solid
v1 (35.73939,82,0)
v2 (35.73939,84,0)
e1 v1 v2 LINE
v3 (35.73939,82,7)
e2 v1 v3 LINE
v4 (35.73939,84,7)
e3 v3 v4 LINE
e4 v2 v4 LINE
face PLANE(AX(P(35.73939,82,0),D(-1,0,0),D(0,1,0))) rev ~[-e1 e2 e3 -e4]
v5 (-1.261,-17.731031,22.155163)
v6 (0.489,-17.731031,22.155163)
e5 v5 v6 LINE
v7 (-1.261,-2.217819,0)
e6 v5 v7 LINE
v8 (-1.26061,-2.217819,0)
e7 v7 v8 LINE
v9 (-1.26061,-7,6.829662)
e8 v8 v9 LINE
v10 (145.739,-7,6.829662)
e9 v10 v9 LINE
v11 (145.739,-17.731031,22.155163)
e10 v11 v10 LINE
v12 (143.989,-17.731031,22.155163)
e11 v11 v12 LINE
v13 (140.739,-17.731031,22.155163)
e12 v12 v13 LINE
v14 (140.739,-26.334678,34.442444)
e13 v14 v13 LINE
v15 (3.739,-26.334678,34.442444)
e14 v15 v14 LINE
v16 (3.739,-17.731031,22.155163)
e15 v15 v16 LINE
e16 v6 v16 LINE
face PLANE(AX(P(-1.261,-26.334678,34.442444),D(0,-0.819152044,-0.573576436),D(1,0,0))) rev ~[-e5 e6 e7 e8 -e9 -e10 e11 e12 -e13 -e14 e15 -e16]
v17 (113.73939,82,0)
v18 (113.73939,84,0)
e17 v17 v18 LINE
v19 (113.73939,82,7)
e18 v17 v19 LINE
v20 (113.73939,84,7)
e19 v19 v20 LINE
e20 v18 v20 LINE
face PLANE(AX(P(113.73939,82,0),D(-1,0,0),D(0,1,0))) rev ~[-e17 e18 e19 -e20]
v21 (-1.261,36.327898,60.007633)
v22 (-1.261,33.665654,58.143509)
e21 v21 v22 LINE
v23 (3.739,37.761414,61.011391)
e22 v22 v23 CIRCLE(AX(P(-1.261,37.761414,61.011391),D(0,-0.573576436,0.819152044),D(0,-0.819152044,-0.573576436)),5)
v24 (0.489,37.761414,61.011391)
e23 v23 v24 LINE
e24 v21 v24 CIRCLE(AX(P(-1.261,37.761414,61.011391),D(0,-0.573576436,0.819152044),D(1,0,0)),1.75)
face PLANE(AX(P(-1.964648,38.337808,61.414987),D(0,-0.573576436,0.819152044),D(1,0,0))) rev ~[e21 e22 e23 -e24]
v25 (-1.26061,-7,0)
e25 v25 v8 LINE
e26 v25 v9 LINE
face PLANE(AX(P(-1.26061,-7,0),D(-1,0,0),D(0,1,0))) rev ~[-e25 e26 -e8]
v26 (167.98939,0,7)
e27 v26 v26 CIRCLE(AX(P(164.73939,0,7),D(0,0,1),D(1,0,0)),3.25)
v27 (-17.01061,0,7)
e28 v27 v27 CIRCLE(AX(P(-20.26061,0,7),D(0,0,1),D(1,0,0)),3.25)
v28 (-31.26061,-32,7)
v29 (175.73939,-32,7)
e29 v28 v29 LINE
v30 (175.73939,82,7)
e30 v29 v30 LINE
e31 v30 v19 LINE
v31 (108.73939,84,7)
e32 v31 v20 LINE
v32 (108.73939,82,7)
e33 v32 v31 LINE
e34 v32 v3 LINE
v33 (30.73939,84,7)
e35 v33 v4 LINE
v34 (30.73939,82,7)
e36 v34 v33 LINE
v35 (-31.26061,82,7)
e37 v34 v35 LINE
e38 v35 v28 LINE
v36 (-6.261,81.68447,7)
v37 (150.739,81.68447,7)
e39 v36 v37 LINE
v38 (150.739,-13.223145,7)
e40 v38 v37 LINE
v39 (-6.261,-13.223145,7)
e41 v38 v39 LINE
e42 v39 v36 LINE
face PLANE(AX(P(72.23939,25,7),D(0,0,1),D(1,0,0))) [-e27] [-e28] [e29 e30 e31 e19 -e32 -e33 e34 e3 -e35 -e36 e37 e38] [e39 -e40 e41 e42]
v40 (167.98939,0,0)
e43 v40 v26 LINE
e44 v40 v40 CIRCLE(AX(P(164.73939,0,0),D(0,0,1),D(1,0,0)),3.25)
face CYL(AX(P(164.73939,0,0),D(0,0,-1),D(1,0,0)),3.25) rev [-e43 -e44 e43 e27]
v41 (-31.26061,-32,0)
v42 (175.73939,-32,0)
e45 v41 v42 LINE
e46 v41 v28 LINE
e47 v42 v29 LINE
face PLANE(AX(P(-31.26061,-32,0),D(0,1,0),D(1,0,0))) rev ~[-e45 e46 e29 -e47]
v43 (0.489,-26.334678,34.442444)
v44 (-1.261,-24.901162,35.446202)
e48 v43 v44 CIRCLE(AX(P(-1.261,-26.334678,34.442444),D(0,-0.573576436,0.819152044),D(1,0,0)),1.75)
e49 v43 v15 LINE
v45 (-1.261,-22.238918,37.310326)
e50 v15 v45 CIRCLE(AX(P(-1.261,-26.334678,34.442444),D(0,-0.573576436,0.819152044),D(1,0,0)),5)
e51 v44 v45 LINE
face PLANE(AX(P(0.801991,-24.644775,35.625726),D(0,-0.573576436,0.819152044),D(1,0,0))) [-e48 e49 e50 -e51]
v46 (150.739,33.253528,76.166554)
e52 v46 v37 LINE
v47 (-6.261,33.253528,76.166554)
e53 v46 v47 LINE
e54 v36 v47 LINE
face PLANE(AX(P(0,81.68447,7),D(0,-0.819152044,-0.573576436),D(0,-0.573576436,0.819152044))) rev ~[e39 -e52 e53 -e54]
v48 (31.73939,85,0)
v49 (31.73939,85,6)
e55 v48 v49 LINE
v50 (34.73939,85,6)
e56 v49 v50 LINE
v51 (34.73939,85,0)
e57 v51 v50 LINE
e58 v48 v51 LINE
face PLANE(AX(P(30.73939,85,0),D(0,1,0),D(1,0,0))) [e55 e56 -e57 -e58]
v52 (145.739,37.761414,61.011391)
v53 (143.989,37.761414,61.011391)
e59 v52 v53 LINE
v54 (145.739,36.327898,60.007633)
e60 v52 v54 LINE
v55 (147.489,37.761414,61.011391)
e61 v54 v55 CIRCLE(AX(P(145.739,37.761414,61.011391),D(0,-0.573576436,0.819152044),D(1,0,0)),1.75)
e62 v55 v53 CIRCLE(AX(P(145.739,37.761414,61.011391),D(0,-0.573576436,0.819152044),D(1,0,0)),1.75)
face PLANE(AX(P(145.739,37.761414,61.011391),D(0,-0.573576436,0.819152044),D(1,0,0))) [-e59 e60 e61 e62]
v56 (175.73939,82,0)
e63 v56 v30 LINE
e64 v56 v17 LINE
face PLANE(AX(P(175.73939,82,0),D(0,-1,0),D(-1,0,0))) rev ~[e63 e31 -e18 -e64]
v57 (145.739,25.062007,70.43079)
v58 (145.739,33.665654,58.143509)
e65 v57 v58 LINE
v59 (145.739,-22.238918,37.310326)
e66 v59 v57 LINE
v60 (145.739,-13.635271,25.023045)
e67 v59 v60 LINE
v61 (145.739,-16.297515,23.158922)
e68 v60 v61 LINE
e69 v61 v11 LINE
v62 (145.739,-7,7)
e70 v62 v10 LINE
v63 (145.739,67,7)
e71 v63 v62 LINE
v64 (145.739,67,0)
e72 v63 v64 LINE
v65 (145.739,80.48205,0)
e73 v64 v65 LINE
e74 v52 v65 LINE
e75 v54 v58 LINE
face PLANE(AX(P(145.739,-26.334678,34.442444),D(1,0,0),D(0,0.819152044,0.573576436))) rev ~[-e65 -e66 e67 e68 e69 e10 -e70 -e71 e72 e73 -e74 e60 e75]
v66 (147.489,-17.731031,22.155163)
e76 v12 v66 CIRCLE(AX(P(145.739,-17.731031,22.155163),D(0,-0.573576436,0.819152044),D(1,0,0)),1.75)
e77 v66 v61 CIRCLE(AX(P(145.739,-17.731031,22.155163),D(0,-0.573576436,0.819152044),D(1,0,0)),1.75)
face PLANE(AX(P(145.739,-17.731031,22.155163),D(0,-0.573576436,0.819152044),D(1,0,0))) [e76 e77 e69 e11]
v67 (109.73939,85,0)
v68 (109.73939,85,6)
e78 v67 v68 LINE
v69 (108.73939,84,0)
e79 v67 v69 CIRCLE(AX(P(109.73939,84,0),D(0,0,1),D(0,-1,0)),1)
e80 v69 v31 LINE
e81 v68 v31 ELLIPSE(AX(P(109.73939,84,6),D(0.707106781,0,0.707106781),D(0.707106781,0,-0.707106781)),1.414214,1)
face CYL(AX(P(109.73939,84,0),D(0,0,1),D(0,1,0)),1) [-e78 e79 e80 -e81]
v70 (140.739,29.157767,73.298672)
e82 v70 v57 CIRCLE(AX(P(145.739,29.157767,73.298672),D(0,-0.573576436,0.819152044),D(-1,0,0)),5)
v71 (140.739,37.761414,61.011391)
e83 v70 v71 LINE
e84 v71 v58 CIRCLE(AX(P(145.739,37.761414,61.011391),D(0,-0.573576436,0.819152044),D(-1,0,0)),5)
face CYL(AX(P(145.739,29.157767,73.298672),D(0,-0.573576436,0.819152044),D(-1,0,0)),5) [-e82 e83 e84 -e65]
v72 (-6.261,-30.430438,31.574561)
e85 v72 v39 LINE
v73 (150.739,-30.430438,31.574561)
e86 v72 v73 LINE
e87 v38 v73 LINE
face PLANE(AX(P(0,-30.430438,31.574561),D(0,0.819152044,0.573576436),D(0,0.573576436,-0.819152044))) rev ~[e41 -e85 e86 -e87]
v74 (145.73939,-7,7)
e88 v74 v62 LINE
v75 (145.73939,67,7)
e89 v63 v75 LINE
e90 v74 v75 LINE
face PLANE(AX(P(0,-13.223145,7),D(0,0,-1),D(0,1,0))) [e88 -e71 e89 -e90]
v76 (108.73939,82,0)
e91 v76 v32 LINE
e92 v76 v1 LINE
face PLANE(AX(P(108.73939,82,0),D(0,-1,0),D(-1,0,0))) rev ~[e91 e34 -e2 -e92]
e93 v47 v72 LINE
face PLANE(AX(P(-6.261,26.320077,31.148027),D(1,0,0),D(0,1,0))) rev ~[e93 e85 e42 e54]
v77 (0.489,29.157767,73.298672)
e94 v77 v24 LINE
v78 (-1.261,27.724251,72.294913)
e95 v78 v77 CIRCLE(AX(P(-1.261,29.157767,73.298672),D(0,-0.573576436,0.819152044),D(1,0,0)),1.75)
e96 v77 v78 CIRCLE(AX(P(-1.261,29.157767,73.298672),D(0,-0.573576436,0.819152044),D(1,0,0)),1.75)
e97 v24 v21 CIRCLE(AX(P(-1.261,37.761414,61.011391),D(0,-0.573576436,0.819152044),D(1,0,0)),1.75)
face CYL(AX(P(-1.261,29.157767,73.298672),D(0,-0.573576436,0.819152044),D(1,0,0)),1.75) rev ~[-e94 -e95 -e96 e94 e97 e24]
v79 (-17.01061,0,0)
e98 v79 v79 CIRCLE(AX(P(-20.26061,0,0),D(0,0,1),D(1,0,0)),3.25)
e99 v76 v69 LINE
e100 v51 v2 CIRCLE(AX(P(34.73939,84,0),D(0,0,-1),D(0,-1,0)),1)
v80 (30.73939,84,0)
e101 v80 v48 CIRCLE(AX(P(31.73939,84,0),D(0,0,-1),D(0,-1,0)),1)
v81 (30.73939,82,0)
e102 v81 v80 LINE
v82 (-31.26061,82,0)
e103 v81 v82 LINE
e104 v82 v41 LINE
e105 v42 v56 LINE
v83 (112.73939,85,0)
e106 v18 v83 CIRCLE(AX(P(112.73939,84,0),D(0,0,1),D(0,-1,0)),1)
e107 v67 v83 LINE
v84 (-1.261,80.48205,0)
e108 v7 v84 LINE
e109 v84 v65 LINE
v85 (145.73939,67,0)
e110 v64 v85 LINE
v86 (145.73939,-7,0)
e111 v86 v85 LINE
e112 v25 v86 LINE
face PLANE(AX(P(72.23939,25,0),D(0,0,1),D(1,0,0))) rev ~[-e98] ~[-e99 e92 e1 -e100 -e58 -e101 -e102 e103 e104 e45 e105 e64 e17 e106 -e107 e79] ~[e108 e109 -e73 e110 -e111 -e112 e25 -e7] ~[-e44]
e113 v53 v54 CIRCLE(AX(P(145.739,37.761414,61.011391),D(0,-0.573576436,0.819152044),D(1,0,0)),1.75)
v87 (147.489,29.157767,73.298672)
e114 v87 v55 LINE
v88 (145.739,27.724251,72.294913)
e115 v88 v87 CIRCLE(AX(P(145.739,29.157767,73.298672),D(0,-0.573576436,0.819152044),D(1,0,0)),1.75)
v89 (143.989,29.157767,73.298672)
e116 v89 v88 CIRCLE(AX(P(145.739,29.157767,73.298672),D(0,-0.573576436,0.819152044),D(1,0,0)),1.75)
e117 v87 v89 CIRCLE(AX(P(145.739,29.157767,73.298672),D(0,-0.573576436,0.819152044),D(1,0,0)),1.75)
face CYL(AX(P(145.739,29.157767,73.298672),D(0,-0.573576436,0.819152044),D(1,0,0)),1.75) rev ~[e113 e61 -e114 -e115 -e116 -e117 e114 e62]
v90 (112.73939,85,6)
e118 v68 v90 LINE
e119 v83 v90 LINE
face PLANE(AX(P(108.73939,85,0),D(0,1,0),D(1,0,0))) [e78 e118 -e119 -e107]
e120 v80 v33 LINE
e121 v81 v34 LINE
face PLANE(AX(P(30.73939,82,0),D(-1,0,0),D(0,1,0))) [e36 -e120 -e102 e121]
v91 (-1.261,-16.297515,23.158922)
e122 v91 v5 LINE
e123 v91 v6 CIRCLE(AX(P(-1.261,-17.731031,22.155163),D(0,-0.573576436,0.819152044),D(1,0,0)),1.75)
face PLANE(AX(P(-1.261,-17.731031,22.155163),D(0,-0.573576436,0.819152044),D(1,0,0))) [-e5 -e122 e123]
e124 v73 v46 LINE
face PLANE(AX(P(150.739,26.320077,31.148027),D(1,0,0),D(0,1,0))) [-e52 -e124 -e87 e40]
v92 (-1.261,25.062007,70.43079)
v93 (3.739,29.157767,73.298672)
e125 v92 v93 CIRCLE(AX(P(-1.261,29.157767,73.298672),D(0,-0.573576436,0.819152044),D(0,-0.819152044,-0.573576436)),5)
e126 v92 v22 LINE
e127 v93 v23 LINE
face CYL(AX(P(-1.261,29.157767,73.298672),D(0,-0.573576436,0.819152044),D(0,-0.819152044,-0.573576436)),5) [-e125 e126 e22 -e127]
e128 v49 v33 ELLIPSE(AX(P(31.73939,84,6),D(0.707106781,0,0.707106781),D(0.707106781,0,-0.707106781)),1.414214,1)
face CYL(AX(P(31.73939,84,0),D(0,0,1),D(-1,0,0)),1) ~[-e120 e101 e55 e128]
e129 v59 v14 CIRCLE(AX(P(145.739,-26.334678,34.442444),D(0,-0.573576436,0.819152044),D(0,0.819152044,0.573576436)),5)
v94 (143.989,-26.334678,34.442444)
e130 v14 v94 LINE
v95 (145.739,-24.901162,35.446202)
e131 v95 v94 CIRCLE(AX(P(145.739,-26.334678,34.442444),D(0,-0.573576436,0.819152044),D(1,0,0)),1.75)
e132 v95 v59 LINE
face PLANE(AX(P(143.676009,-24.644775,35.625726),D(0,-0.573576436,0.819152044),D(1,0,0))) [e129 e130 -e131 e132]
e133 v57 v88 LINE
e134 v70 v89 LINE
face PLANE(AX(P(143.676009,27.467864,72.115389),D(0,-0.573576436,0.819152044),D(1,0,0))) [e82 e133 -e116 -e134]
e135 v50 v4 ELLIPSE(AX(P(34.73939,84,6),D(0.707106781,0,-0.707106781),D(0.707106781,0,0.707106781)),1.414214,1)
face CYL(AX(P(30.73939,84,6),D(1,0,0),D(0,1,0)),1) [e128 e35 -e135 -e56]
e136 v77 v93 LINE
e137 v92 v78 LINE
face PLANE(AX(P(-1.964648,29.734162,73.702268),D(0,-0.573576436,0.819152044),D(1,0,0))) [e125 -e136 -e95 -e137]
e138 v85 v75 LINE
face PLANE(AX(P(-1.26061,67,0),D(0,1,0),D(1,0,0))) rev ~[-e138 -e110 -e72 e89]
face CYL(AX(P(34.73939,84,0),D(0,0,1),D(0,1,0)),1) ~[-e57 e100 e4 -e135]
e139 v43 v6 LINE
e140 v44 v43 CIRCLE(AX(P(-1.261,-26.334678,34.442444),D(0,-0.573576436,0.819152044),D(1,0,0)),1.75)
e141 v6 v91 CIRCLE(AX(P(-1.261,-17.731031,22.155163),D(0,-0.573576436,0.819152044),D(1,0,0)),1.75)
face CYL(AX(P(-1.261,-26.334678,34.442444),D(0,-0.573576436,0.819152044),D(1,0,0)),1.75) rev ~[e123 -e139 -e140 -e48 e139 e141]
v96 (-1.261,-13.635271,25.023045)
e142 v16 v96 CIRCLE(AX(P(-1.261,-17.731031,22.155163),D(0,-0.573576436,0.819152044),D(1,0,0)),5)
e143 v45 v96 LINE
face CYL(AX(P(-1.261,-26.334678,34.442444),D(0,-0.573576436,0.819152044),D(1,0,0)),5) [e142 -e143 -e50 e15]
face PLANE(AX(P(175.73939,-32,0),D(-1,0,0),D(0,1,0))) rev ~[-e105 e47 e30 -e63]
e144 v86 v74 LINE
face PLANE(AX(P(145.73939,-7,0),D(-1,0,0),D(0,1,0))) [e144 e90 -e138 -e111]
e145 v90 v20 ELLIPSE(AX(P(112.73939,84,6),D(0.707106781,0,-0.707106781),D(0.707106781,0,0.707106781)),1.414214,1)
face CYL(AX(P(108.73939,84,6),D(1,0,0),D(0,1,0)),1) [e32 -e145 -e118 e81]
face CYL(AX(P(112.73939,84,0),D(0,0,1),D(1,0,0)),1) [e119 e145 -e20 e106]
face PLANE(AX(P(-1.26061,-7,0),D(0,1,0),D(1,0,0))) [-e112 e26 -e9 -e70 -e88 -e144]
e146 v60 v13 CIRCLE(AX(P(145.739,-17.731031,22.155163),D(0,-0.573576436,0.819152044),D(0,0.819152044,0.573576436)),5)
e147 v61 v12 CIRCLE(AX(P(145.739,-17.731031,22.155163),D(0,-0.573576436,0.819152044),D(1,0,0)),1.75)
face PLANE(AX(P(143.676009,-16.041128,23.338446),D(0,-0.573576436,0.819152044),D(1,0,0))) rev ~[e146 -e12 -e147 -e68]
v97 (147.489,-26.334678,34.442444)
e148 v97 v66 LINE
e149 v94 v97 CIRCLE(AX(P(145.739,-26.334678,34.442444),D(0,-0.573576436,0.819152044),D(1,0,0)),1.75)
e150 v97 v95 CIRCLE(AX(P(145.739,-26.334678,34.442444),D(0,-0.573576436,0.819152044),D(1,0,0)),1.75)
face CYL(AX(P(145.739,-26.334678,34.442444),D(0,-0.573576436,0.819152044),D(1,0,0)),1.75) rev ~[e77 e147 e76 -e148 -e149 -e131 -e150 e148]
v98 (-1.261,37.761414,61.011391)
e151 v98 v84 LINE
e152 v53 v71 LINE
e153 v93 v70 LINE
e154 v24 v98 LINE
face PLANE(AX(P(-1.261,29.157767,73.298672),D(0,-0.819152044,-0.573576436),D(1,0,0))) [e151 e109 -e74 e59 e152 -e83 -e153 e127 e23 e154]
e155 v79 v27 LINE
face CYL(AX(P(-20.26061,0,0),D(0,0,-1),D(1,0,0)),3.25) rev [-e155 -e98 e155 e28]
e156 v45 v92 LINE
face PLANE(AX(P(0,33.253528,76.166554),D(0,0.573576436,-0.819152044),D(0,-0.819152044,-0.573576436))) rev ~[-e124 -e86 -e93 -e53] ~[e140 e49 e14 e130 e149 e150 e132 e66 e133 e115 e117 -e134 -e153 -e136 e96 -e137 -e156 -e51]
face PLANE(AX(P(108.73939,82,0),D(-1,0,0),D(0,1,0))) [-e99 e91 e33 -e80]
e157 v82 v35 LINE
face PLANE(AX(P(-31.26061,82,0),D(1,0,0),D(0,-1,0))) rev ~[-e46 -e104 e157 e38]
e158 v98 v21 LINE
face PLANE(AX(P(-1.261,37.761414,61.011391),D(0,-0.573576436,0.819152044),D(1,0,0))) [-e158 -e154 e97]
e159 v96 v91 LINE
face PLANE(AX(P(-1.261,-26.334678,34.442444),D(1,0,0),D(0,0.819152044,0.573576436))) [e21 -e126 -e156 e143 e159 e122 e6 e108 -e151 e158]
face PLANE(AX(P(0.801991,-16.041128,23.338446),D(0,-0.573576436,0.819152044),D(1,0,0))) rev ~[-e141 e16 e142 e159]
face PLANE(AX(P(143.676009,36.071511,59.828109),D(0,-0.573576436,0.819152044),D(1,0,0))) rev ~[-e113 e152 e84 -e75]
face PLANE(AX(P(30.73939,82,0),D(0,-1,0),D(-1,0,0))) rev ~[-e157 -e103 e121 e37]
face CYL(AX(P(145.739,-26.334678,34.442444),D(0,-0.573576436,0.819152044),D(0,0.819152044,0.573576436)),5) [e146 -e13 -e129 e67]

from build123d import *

# Parameters (mm, degrees)
F0_R          = 3.25
F0_W          = 147
F0_H          = 74
F0_W_2        = 5
F0_H_2        = 3
F1_DEPTH      = 7
F4_DEPTH      = 150.739
F4_DEPTH_BACK = 6.261
F5_W          = 147
F5_H          = 67.7437671193
F6_DEPTH      = 156.2
F7_R          = 1
F9_DEPTH      = 15
F10_R         = 1.75
F11_DEPTH     = 15


# Not quite as in the source:
# - a feature names something its author has since deleted; it is built from what else it names


with BuildPart() as f1:
    # F0 (on Top) → F1 (new body)
    with BuildSketch(Plane.XY):
        Polygon((30.7393903136, 82), (-31.2606096864, 82), (-31.2606096864, -32), (175.7393903136, -32), (175.7393903136, 82), (113.7393903136, 82), (108.7393903136, 82), (35.7393903136, 82), align=None)
        with Locations((-20.2606096864, 0)):
            Circle(F0_R, mode=Mode.SUBTRACT)
        with Locations((164.7393903136, 0)):
            Circle(F0_R, mode=Mode.SUBTRACT)
        with Locations((72.2393903136, 30)):
            Rectangle(F0_W, F0_H, mode=Mode.SUBTRACT)
        with Locations((33.2393903136, 83.5)):
            Rectangle(F0_W_2, F0_H_2)
        with Locations((111.2393903136, 83.5)):
            Rectangle(F0_W_2, F0_H_2)
    extrude(amount=F1_DEPTH)

    # F3 (on Right) → F4 (join, two sides)
    with BuildSketch(Plane.YZ) as f4_sk:
        Polygon((-13.2231451571, 7), (81.6844701767, 7), (33.2535275188, 76.1665542214), (-30.4304382476, 31.5745613287), align=None)
    extrude(amount=F4_DEPTH)
    extrude(f4_sk.sketch, amount=-F4_DEPTH_BACK)

    # F5 (on face) → F6 (cut)
    with BuildSketch(Plane(origin=(0, -24.8464988409, 35.4844777942), x_dir=(1, 0, 0), z_dir=(0, -0.5735764364, 0.8191520443))):
        with Locations((72.239, 32.0551522267)):
            Rectangle(F5_W, F5_H)
    extrude(amount=-F6_DEPTH, mode=Mode.SUBTRACT)

    # F7
    f7_edges = [f1.edges().sort_by_distance(p)[0] for p in [
        (111.23939, 85, 7),
        (33.23939, 85, 7),
        (35.73939, 85, 3.5),
        (30.73939, 85, 3.5),
        (108.73939, 85, 3.5),
        (113.73939, 85, 3.5),
    ]]
    fillet(f7_edges, radius=F7_R)

    # F8 (on face) → F9 (join)
    with BuildSketch(Plane(origin=(0, -24.8464988409, 35.4844777942), x_dir=(1, 0, 0), z_dir=(0, -0.5735764364, 0.8191520443))):
        with BuildLine():
            Line((-1.261, 65.9270357864), (3.739, 65.9270357864))
            ThreePointArc((3.739, 65.9270357864), (2.2745339059, 69.4625696923), (-1.261, 70.9270357864))
            Line((-1.261, 70.9270357864), (-6.261, 70.9270357864))
            Line((-6.261, 70.9270357864), (-6.261, 65.9270357864))
            ThreePointArc((-6.261, 65.9270357864), (-4.7965339059, 62.3915018804), (-1.261, 60.9270357864))
            Line((-1.261, 60.9270357864), (-1.261, 65.9270357864))
        make_face()
        with BuildLine():
            ThreePointArc((-1.261, 60.9270357864), (2.2745339059, 62.3915018804), (3.739, 65.9270357864))
            Line((3.739, 65.9270357864), (-1.261, 65.9270357864))
            Line((-1.261, 65.9270357864), (-1.261, 60.9270357864))
        make_face()
        with BuildLine():
            Line((145.739, -1.8167313329), (145.739, 3.1832686671))
            ThreePointArc((145.739, 3.1832686671), (142.2034660941, 1.718802573), (140.739, -1.8167313329))
            Line((140.739, -1.8167313329), (145.739, -1.8167313329))
        make_face()
        with BuildLine():
            ThreePointArc((140.739, 65.9270357864), (142.2034660941, 62.3915018804), (145.739, 60.9270357864))
            Line((145.739, 60.9270357864), (145.739, 65.9270357864))
            Line((145.739, 65.9270357864), (140.739, 65.9270357864))
        make_face()
        with BuildLine():
            Line((150.739, -6.8167313329), (150.739, -1.8167313329))
            ThreePointArc((150.739, -1.8167313329), (149.2745339059, 1.718802573), (145.739, 3.1832686671))
            Line((145.739, 3.1832686671), (145.739, -1.8167313329))
            Line((145.739, -1.8167313329), (140.739, -1.8167313329))
            ThreePointArc((140.739, -1.8167313329), (142.2034660941, -5.3522652388), (145.739, -6.8167313329))
            Line((145.739, -6.8167313329), (150.739, -6.8167313329))
        make_face()
        with BuildLine():
            ThreePointArc((145.739, 60.9270357864), (149.2745339059, 62.3915018804), (150.739, 65.9270357864))
            Line((150.739, 65.9270357864), (150.739, 70.9270357864))
            Line((150.739, 70.9270357864), (145.739, 70.9270357864))
            ThreePointArc((145.739, 70.9270357864), (142.2034660941, 69.4625696923), (140.739, 65.9270357864))
            Line((140.739, 65.9270357864), (145.739, 65.9270357864))
            Line((145.739, 65.9270357864), (145.739, 60.9270357864))
        make_face()
        with BuildLine():
            Line((-1.261, -1.8167313329), (3.739, -1.8167313329))
            ThreePointArc((3.739, -1.8167313329), (2.2745339059, 1.718802573), (-1.261, 3.1832686671))
            Line((-1.261, 3.1832686671), (-1.261, -1.8167313329))
        make_face()
    extrude(amount=-F9_DEPTH)

    # F10 (on face) → F11 (cut)
    with BuildSketch(Plane(origin=(0, -24.8464988409, 35.4844777942), x_dir=(1, 0, 0), z_dir=(0, -0.5735764364, 0.8191520443))):
        with Locations((145.739, -1.8167313329)):
            Circle(F10_R)
        with Locations((145.739, 65.9270357864)):
            Circle(F10_R)
        with Locations((-1.261, 65.9270357864)):
            Circle(F10_R)
        with Locations((-1.261, -1.8167313329)):
            Circle(F10_R)
    extrude(amount=-F11_DEPTH, mode=Mode.SUBTRACT)


solid = f1.part
